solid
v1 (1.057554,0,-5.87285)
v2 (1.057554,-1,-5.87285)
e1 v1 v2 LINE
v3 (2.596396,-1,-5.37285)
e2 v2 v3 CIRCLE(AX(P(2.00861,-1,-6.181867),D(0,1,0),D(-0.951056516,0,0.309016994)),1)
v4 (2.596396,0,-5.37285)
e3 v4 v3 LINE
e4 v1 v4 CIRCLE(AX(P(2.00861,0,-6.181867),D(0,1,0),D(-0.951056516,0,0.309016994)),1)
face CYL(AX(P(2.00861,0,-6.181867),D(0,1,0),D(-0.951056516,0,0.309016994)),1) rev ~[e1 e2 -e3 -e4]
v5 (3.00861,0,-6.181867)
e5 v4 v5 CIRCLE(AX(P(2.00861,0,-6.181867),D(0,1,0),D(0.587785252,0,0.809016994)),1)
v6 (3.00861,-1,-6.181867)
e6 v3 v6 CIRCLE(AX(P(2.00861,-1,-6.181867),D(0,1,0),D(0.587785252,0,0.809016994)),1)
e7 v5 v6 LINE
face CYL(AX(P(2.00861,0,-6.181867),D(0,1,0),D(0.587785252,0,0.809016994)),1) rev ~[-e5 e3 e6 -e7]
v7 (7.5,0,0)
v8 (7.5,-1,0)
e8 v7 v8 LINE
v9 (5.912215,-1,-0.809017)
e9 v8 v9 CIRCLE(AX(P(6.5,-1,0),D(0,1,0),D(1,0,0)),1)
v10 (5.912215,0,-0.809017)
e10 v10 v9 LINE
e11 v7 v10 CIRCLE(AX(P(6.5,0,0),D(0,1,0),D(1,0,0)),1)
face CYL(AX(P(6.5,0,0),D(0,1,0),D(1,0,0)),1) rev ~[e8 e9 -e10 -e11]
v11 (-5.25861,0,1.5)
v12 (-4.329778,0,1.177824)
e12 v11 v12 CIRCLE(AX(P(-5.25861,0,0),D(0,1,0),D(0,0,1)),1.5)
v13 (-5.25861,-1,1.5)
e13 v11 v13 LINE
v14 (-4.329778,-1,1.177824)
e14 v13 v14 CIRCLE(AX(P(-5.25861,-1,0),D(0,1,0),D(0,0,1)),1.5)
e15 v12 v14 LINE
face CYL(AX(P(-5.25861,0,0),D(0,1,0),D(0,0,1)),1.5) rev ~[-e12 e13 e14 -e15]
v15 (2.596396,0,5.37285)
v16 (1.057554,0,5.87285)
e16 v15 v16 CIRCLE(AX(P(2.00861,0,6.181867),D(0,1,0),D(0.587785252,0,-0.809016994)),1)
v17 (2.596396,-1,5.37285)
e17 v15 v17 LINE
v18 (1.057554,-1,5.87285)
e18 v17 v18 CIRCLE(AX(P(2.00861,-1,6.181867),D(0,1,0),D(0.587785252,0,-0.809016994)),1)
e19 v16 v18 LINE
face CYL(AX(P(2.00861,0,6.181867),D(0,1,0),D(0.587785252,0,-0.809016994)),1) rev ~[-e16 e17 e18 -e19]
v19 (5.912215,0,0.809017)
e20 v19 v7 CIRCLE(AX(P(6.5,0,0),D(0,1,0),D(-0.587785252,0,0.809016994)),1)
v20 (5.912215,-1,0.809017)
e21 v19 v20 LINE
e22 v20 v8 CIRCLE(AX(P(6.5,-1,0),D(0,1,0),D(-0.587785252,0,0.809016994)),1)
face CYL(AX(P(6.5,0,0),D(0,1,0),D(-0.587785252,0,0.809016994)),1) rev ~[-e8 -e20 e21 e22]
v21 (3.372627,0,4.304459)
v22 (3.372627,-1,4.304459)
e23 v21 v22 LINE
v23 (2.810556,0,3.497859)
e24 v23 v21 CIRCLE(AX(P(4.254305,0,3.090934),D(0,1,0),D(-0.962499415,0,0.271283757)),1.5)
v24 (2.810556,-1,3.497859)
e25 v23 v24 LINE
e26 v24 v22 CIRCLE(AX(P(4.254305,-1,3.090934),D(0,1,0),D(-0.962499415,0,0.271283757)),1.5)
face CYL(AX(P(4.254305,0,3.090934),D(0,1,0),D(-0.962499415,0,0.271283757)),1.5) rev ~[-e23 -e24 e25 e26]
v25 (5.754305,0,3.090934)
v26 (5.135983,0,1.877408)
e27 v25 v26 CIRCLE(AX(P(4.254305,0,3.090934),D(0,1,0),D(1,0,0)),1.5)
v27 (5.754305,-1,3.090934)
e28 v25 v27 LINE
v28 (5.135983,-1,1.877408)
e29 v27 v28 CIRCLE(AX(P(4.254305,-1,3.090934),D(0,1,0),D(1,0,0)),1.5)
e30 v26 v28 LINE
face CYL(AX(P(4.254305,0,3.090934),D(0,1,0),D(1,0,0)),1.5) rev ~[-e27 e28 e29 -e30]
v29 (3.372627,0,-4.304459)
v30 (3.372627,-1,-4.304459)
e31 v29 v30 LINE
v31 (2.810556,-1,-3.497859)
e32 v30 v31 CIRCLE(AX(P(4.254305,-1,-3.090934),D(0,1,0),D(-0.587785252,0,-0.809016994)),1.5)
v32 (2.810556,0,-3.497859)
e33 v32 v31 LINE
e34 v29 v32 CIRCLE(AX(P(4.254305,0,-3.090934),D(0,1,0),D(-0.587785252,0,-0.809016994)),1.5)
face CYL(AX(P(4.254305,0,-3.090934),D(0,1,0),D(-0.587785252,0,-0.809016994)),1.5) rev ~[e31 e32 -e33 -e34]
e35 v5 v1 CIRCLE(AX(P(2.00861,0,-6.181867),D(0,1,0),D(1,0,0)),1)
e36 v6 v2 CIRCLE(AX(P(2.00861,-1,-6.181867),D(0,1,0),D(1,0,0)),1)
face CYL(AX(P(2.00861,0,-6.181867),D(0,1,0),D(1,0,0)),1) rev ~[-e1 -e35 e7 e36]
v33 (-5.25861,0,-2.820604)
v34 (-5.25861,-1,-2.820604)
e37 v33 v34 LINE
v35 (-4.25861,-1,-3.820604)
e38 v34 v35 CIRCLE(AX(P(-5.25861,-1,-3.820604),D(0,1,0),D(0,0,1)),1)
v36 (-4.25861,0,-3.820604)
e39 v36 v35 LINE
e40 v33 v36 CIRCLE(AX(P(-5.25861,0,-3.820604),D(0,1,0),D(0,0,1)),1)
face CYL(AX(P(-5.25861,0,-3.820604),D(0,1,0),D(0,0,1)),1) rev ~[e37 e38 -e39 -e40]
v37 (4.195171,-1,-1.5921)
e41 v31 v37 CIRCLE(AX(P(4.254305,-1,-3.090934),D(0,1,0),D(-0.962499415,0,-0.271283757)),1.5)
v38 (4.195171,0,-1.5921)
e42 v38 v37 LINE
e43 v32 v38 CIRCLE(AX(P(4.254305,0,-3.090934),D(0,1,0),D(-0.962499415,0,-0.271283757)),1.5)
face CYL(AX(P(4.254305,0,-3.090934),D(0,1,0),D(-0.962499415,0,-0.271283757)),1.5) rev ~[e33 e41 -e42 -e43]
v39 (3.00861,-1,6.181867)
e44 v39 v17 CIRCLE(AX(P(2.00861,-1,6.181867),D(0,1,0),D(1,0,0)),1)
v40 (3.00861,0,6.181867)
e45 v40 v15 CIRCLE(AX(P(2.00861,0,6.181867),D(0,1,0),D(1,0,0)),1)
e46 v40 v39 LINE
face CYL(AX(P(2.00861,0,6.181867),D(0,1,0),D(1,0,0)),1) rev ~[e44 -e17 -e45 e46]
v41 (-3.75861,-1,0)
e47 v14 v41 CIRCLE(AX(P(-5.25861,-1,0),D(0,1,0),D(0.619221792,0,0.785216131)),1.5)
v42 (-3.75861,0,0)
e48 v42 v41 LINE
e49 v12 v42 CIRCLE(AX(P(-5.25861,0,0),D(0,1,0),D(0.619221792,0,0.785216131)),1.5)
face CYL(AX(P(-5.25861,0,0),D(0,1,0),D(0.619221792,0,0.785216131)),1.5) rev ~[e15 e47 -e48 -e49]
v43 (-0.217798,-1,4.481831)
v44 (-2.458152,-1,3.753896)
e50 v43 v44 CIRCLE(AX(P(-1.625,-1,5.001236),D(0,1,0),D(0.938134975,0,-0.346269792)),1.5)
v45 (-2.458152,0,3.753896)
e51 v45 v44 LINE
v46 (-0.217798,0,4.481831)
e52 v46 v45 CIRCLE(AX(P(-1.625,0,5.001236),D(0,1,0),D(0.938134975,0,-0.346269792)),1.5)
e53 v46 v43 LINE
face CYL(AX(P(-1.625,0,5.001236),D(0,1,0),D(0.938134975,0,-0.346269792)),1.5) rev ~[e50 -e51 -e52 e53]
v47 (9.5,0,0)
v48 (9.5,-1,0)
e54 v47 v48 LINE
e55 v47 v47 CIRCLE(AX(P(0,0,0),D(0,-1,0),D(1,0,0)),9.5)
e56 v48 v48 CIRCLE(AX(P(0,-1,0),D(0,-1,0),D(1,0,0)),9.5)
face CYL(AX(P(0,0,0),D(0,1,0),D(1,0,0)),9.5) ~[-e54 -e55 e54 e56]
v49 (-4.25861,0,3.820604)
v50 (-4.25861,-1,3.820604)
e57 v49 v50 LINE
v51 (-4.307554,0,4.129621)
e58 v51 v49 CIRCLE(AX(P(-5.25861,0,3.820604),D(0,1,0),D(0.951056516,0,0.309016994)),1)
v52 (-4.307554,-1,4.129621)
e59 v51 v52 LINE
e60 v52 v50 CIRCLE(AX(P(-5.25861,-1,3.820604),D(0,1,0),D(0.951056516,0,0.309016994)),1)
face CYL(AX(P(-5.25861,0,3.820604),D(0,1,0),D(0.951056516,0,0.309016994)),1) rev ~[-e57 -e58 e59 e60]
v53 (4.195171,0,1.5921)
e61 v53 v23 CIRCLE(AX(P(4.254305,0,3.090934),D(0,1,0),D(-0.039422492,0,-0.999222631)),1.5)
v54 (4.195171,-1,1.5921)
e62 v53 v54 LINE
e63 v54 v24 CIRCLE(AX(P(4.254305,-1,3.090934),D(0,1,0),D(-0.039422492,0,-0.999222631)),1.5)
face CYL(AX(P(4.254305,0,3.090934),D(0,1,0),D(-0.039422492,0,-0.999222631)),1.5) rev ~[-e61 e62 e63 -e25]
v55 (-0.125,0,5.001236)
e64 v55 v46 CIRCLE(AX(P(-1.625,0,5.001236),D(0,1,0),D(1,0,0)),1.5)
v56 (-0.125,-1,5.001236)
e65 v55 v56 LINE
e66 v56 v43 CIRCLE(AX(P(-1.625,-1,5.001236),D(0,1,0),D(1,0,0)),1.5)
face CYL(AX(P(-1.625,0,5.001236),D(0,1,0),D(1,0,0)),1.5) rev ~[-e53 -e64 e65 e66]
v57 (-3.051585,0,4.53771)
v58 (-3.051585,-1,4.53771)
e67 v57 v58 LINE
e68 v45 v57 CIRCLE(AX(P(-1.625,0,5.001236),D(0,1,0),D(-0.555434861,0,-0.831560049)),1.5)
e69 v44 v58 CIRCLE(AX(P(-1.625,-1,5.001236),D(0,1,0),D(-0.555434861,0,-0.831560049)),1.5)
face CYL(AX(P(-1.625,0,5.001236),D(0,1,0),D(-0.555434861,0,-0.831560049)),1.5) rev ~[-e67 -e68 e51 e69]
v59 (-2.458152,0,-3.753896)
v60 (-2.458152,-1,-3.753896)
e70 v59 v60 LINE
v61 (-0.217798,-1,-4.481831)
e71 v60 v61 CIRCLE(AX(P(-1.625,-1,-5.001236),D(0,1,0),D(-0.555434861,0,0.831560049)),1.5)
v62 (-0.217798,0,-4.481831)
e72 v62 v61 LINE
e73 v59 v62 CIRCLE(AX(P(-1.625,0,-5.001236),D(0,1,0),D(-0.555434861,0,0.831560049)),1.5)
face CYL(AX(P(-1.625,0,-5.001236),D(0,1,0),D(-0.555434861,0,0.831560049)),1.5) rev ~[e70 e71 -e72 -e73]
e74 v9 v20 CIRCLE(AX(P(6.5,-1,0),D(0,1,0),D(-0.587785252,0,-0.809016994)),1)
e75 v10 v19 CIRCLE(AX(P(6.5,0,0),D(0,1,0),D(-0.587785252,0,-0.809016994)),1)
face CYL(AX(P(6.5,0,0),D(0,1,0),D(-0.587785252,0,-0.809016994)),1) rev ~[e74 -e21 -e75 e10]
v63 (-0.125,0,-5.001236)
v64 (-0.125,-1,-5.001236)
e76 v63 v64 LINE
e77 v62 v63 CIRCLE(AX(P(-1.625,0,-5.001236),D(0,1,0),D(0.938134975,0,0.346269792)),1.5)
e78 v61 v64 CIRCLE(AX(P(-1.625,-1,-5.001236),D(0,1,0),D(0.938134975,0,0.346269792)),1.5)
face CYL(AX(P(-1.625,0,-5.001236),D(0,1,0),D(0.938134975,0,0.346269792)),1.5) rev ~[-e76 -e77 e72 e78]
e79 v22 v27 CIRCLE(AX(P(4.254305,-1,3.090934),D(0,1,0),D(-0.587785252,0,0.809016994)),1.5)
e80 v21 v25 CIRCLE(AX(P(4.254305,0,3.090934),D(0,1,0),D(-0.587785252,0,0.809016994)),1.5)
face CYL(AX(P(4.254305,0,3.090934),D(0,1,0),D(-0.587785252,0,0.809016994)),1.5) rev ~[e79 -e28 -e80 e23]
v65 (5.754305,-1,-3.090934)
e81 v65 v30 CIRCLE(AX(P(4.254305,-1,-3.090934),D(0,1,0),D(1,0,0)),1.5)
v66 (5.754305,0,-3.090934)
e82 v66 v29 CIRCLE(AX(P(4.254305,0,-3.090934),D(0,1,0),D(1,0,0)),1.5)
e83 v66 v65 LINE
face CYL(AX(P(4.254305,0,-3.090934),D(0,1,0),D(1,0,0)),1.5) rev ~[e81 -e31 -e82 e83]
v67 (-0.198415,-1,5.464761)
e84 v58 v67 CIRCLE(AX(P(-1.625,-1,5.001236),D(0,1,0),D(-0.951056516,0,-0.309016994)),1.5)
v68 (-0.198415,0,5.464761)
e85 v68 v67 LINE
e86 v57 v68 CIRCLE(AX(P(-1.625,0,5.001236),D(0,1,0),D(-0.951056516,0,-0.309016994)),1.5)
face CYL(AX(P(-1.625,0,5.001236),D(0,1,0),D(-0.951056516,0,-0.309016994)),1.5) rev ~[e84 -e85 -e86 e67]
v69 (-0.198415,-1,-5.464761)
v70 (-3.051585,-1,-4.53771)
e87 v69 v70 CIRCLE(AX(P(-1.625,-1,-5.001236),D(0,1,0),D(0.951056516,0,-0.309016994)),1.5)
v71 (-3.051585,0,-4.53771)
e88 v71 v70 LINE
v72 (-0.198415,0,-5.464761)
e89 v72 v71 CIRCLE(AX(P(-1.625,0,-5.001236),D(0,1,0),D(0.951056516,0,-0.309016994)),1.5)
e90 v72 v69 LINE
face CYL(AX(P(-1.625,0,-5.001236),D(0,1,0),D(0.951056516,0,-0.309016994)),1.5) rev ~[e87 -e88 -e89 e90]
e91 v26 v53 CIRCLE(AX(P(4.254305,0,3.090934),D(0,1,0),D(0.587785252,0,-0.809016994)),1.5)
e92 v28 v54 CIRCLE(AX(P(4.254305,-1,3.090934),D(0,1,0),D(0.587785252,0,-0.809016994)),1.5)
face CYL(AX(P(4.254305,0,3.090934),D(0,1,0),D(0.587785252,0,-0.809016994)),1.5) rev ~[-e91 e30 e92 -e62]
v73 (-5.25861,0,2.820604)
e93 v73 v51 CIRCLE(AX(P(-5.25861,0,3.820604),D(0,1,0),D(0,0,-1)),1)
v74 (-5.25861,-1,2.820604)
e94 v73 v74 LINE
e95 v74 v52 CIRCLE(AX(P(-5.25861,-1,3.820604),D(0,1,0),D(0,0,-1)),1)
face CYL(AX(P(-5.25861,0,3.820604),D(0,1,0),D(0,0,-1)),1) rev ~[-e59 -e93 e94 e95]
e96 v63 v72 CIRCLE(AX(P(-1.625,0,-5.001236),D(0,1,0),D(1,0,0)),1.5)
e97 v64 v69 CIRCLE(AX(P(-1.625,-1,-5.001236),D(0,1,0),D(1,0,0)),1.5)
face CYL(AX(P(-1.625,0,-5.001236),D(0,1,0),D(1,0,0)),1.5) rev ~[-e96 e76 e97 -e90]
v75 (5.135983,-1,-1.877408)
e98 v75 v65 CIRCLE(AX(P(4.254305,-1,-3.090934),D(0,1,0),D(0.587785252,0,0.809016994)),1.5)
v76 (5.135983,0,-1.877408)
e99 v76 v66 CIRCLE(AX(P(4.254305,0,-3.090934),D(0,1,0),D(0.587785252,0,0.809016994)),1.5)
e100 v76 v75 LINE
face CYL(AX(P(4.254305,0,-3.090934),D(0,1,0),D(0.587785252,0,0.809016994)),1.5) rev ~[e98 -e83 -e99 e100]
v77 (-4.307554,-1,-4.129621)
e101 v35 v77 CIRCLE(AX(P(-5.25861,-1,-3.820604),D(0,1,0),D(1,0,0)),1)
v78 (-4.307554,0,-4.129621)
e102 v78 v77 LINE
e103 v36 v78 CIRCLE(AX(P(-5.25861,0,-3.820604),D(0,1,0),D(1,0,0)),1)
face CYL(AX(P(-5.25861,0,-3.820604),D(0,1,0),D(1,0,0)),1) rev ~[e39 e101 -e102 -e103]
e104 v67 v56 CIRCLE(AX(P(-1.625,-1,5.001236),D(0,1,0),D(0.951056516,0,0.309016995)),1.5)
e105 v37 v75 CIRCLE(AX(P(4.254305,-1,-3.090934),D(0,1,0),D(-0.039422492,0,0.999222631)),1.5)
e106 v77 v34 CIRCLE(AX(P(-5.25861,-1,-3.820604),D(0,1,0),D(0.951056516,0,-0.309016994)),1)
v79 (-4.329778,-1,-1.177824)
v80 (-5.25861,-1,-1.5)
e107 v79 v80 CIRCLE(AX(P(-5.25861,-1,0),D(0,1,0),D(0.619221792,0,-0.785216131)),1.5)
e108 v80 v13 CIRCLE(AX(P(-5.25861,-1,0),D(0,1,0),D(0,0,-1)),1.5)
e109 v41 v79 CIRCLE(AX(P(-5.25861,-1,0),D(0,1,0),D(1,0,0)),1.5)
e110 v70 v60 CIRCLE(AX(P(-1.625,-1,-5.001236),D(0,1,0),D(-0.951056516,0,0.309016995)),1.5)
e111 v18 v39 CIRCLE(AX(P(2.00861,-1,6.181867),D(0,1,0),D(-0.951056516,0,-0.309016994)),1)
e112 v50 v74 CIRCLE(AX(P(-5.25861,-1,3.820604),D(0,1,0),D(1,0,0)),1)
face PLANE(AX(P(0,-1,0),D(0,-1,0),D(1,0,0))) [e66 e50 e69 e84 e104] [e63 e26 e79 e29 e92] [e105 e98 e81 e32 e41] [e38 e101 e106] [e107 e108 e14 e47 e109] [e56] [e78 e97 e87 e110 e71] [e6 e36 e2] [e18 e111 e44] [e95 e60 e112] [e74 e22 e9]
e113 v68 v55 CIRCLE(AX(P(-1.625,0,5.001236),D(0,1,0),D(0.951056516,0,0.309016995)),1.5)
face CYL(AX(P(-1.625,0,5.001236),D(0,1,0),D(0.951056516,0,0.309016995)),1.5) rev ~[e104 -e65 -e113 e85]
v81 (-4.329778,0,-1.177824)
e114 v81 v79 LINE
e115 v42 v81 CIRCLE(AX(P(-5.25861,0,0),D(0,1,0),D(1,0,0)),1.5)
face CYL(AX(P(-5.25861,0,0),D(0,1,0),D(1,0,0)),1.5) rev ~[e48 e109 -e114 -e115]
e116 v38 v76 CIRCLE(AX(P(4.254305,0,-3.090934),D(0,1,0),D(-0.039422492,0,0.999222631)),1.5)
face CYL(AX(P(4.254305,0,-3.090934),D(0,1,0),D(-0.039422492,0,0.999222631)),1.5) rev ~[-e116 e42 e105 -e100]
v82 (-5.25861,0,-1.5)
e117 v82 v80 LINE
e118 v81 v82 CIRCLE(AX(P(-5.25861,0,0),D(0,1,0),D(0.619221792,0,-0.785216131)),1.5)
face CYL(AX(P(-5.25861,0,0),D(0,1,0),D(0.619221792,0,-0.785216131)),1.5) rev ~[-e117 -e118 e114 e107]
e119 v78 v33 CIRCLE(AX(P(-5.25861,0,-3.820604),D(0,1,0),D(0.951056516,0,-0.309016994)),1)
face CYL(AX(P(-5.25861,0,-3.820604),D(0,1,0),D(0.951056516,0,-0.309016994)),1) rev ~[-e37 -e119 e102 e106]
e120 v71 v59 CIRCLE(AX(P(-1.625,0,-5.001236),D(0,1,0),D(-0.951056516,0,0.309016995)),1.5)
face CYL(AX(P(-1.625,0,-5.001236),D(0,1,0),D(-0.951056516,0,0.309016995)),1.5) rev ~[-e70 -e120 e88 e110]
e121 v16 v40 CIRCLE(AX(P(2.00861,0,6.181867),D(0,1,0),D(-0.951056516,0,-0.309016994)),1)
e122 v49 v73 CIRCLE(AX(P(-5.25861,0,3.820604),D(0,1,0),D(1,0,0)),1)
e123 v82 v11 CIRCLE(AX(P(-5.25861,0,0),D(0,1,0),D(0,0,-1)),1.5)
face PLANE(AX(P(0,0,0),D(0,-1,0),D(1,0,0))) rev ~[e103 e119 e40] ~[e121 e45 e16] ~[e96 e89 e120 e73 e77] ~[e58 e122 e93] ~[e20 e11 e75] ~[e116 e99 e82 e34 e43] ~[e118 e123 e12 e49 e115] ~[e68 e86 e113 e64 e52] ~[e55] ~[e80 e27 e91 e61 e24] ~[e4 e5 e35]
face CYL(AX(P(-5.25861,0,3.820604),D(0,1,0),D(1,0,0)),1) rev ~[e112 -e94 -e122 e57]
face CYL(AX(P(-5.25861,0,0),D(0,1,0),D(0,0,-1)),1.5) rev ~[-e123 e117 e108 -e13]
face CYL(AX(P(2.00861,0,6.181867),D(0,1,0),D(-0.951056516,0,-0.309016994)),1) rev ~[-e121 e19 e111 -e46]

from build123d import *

# Parameters (mm, degrees)
F0_R     = 9.5
F1_DEPTH = 1


# Not quite as in the source:
# - a feature names something its author has since deleted; it is built from what else it names


with BuildPart() as f1:
    # F0 (on Front) → F1 (new body)
    with BuildSketch(Plane.XZ):
        Circle(F0_R)
        with BuildLine():
            Line((-6.1874431518, -2.6427799437), (-5.2586104634, -1.91030207))
            Line((-5.2586104634, -1.91030207), (-5.2586104634, -1.5))
            ThreePointArc((-5.2586104634, -1.5), (-6.7586104634, 0), (-5.2586104634, 1.5))
            Line((-5.2586104634, 1.5), (-5.2586104634, 1.91030207))
            Line((-5.2586104634, 1.91030207), (-6.1874431518, 2.6427799437))
            ThreePointArc((-6.1874431518, 2.6427799437), (-6.472135955, 4.7022820183), (-4.4254581722, 5.0679442137))
            Line((-4.4254581722, 5.0679442137), (-3.4418052317, 4.4109199439))
            Line((-3.4418052317, 4.4109199439), (-3.0515847744, 4.5377102563))
            ThreePointArc((-3.0515847744, 4.5377102563), (-2.0885254916, 6.4278205224), (-0.1984152256, 5.4647612395))
            Line((-0.1984152256, 5.4647612395), (0.1918052317, 5.5915515519))
            Line((0.1918052317, 5.5915515519), (0.601408001, 6.7012720437))
            ThreePointArc((0.601408001, 6.7012720437), (2.2724250824, 7.6584857382), (3.5086104634, 6.1818673559))
            ThreePointArc((3.5086104634, 6.1818673559), (3.4944811986, 5.976469794), (3.4523595855, 5.7749417209))
            Line((3.4523595855, 5.7749417209), (3.1314578476, 4.6364005169))
            Line((3.1314578476, 4.6364005169), (3.3726273533, 4.3044591695))
            ThreePointArc((3.3726273533, 4.3044591695), (4.9352909813, 4.4274434642), (5.7543052317, 3.090933678))
            ThreePointArc((5.7543052317, 3.090933678), (5.590815018, 2.4099479283), (5.1359831102, 1.8774081864))
            Line((5.1359831102, 1.8774081864), (5.3771526159, 1.545466839))
            Line((5.3771526159, 1.545466839), (6.5591337375, 1.4988339471))
            ThreePointArc((6.5591337375, 1.4988339471), (7.5813650184, 1.0395430231), (8, 0))
            ThreePointArc((8, 0), (7.5813650184, -1.0395430231), (6.5591337375, -1.4988339471))
            Line((6.5591337375, -1.4988339471), (5.3771526159, -1.545466839))
            Line((5.3771526159, -1.545466839), (5.1359831102, -1.8774081864))
            ThreePointArc((5.1359831102, -1.8774081864), (5.590815018, -2.4099479283), (5.7543052317, -3.090933678))
            ThreePointArc((5.7543052317, -3.090933678), (4.9352909813, -4.4274434642), (3.3726273533, -4.3044591695))
            Line((3.3726273533, -4.3044591695), (3.1314578476, -4.6364005169))
            Line((3.1314578476, -4.6364005169), (3.4523595855, -5.7749417209))
            ThreePointArc((3.4523595855, -5.7749417209), (3.4944811986, -5.976469794), (3.5086104634, -6.1818673559))
            ThreePointArc((3.5086104634, -6.1818673559), (2.2724250824, -7.6584857382), (0.601408001, -6.7012720437))
            Line((0.601408001, -6.7012720437), (0.1918052317, -5.5915515519))
            Line((0.1918052317, -5.5915515519), (-0.1984152256, -5.4647612395))
            ThreePointArc((-0.1984152256, -5.4647612395), (-2.0885254916, -6.4278205224), (-3.0515847744, -4.5377102563))
            Line((-3.0515847744, -4.5377102563), (-3.4418052317, -4.4109199439))
            Line((-3.4418052317, -4.4109199439), (-4.4254581722, -5.0679442137))
            ThreePointArc((-4.4254581722, -5.0679442137), (-6.472135955, -4.7022820183), (-6.1874431518, -2.6427799437))
        make_face(mode=Mode.SUBTRACT)
        with BuildLine():
            Line((-5.2586104634, -1.91030207), (-5.2586104634, -2.3206041399))
            ThreePointArc((-5.2586104634, -2.3206041399), (-4.1979502917, -2.7599439681), (-3.7586104634, -3.8206041399))
            ThreePointArc((-3.7586104634, -3.8206041399), (-3.7770779525, -4.0552558375), (-3.832025689, -4.2841296315))
            Line((-3.832025689, -4.2841296315), (-3.4418052317, -4.4109199439))
            Line((-3.4418052317, -4.4109199439), (-2.4581522912, -3.7538956741))
            ThreePointArc((-2.4581522912, -3.7538956741), (-1.1614745084, -3.5746509735), (-0.2177975376, -4.4818310601))
            Line((-0.2177975376, -4.4818310601), (0.1918052317, -5.5915515519))
            Line((0.1918052317, -5.5915515519), (0.582025689, -5.7183418644))
            ThreePointArc((0.582025689, -5.7183418644), (1.5450849719, -4.7552825815), (2.8902883419, -4.9683418644))
            Line((2.8902883419, -4.9683418644), (3.1314578476, -4.6364005169))
            Line((3.1314578476, -4.6364005169), (2.8105561096, -3.497859313))
            ThreePointArc((2.8105561096, -3.497859313), (3.0407797402, -2.2092557995), (4.1951714942, -1.5920997308))
            Line((4.1951714942, -1.5920997308), (5.3771526159, -1.545466839))
            Line((5.3771526159, -1.545466839), (5.6183221216, -1.2135254916))
            ThreePointArc((5.6183221216, -1.2135254916), (5, 0), (5.6183221216, 1.2135254916))
            Line((5.6183221216, 1.2135254916), (5.3771526159, 1.545466839))
            Line((5.3771526159, 1.545466839), (4.1951714942, 1.5920997308))
            ThreePointArc((4.1951714942, 1.5920997308), (3.0407797402, 2.2092557995), (2.8105561096, 3.497859313))
            Line((2.8105561096, 3.497859313), (3.1314578476, 4.6364005169))
            Line((3.1314578476, 4.6364005169), (2.8902883419, 4.9683418644))
            ThreePointArc((2.8902883419, 4.9683418644), (1.5450849719, 4.7552825815), (0.582025689, 5.7183418644))
            Line((0.582025689, 5.7183418644), (0.1918052317, 5.5915515519))
            Line((0.1918052317, 5.5915515519), (-0.2177975376, 4.4818310601))
            ThreePointArc((-0.2177975376, 4.4818310601), (-1.1614745084, 3.5746509735), (-2.4581522912, 3.7538956741))
            Line((-2.4581522912, 3.7538956741), (-3.4418052317, 4.4109199439))
            Line((-3.4418052317, 4.4109199439), (-3.832025689, 4.2841296315))
            ThreePointArc((-3.832025689, 4.2841296315), (-3.7770779525, 4.0552558375), (-3.7586104634, 3.8206041399))
            ThreePointArc((-3.7586104634, 3.8206041399), (-4.1979502917, 2.7599439681), (-5.2586104634, 2.3206041399))
            Line((-5.2586104634, 2.3206041399), (-5.2586104634, 1.91030207))
            Line((-5.2586104634, 1.91030207), (-4.3297777751, 1.1778241962))
            ThreePointArc((-4.3297777751, 1.1778241962), (-3.9089347556, 0.6545039983), (-3.7586104634, 0))
            ThreePointArc((-3.7586104634, 0), (-3.9089347556, -0.6545039983), (-4.3297777751, -1.1778241962))
            Line((-4.3297777751, -1.1778241962), (-5.2586104634, -1.91030207))
        make_face()
        with BuildLine():
            ThreePointArc((1.5, 2), (2.2360679775, 1.1180339887), (2.5, 0))
            ThreePointArc((2.5, 0), (2.2360679775, -1.1180339887), (1.5, -2))
            ThreePointArc((1.5, -2), (-2.5, 0), (1.5, 2))
        make_face(mode=Mode.SUBTRACT)
        with BuildLine():
            Line((1.5, -2), (1.5, 2))
            ThreePointArc((1.5, 2), (-2.5, 0), (1.5, -2))
        make_face()
        with BuildLine():
            ThreePointArc((1.5, -2), (2.2360679775, -1.1180339887), (2.5, 0))
            ThreePointArc((2.5, 0), (2.2360679775, 1.1180339887), (1.5, 2))
            Line((1.5, 2), (1.5, -2))
        make_face()
        with BuildLine():
            ThreePointArc((-4.3075539471, -4.1296211343), (-6.0676274578, -4.4083893922), (-5.2586104634, -2.8206041399))
            Line((-5.2586104634, -2.8206041399), (-5.2586104634, -2.3206041399))
            ThreePointArc((-5.2586104634, -2.3206041399), (-5.7501710933, -2.403435079), (-6.1874431518, -2.6427799437))
            ThreePointArc((-6.1874431518, -2.6427799437), (-6.472135955, -4.7022820183), (-4.4254581722, -5.0679442137))
            ThreePointArc((-4.4254581722, -5.0679442137), (-4.0627031818, -4.7260354038), (-3.832025689, -4.2841296315))
            Line((-3.832025689, -4.2841296315), (-4.3075539471, -4.1296211343))
        make_face()
        with BuildLine():
            ThreePointArc((-6.1874431518, 2.6427799437), (-5.7501710933, 2.403435079), (-5.2586104634, 2.3206041399))
            Line((-5.2586104634, 2.3206041399), (-5.2586104634, 2.8206041399))
            ThreePointArc((-5.2586104634, 2.8206041399), (-6.0676274578, 4.4083893922), (-4.3075539471, 4.1296211343))
            Line((-4.3075539471, 4.1296211343), (-3.832025689, 4.2841296315))
            ThreePointArc((-3.832025689, 4.2841296315), (-4.0627031818, 4.7260354038), (-4.4254581722, 5.0679442137))
            ThreePointArc((-4.4254581722, 5.0679442137), (-6.472135955, 4.7022820183), (-6.1874431518, 2.6427799437))
        make_face()
        with BuildLine():
            Line((1.0575539471, -5.8728503615), (0.582025689, -5.7183418644))
            ThreePointArc((0.582025689, -5.7183418644), (0.508902005, -6.2114399724), (0.601408001, -6.7012720437))
            ThreePointArc((0.601408001, -6.7012720437), (2.2724250824, -7.6584857382), (3.5086104634, -6.1818673559))
            ThreePointArc((3.5086104634, -6.1818673559), (3.4944811986, -5.976469794), (3.4523595855, -5.7749417209))
            ThreePointArc((3.4523595855, -5.7749417209), (3.2392824408, -5.3242855906), (2.8902883419, -4.9683418644))
            Line((2.8902883419, -4.9683418644), (2.5963957157, -5.3728503615))
            ThreePointArc((2.5963957157, -5.3728503615), (2.8996169876, -5.7278768562), (3.0086104634, -6.1818673559))
            ThreePointArc((3.0086104634, -6.1818673559), (1.8521759984, -7.1695556965), (1.0575539471, -5.8728503615))
        make_face()
        with BuildLine():
            ThreePointArc((0.601408001, 6.7012720437), (0.508902005, 6.2114399724), (0.582025689, 5.7183418644))
            Line((0.582025689, 5.7183418644), (1.0575539471, 5.8728503615))
            ThreePointArc((1.0575539471, 5.8728503615), (1.8521759984, 7.1695556965), (3.0086104634, 6.1818673559))
            ThreePointArc((3.0086104634, 6.1818673559), (2.8996169876, 5.7278768562), (2.5963957157, 5.3728503615))
            Line((2.5963957157, 5.3728503615), (2.8902883419, 4.9683418644))
            ThreePointArc((2.8902883419, 4.9683418644), (3.2392824408, 5.3242855906), (3.4523595855, 5.7749417209))
            ThreePointArc((3.4523595855, 5.7749417209), (3.4944811986, 5.976469794), (3.5086104634, 6.1818673559))
            ThreePointArc((3.5086104634, 6.1818673559), (2.2724250824, 7.6584857382), (0.601408001, 6.7012720437))
        make_face()
        with BuildLine():
            Line((5.9122147477, -0.8090169944), (5.6183221216, -1.2135254916))
            ThreePointArc((5.6183221216, -1.2135254916), (6.0646898294, -1.435445943), (6.5591337375, -1.4988339471))
            ThreePointArc((6.5591337375, -1.4988339471), (7.5813650184, -1.0395430231), (8, 0))
            ThreePointArc((8, 0), (7.5813650184, 1.0395430231), (6.5591337375, 1.4988339471))
            ThreePointArc((6.5591337375, 1.4988339471), (6.0646898294, 1.435445943), (5.6183221216, 1.2135254916))
            Line((5.6183221216, 1.2135254916), (5.9122147477, 0.8090169944))
            ThreePointArc((5.9122147477, 0.8090169944), (6.9539904997, 0.8910065242), (7.5, 0))
            ThreePointArc((7.5, 0), (6.9539904997, -0.8910065242), (5.9122147477, -0.8090169944))
        make_face()
        with BuildLine():
            Line((-5.2586104634, -2.3206041399), (-5.2586104634, -2.8206041399))
            ThreePointArc((-5.2586104634, -2.8206041399), (-4.5515036823, -3.1134973587), (-4.2586104634, -3.8206041399))
            ThreePointArc((-4.2586104634, -3.8206041399), (-4.2709221228, -3.9770386049), (-4.3075539471, -4.1296211343))
            Line((-4.3075539471, -4.1296211343), (-3.832025689, -4.2841296315))
            ThreePointArc((-3.832025689, -4.2841296315), (-3.7770779525, -4.0552558375), (-3.7586104634, -3.8206041399))
            ThreePointArc((-3.7586104634, -3.8206041399), (-4.1979502917, -2.7599439681), (-5.2586104634, -2.3206041399))
        make_face()
        with BuildLine():
            Line((-5.2586104634, 2.8206041399), (-5.2586104634, 2.3206041399))
            ThreePointArc((-5.2586104634, 2.3206041399), (-4.1979502917, 2.7599439681), (-3.7586104634, 3.8206041399))
            ThreePointArc((-3.7586104634, 3.8206041399), (-3.7770779525, 4.0552558375), (-3.832025689, 4.2841296315))
            Line((-3.832025689, 4.2841296315), (-4.3075539471, 4.1296211343))
            ThreePointArc((-4.3075539471, 4.1296211343), (-4.2709221228, 3.9770386049), (-4.2586104634, 3.8206041399))
            ThreePointArc((-4.2586104634, 3.8206041399), (-4.5515036823, 3.1134973587), (-5.2586104634, 2.8206041399))
        make_face()
        with BuildLine():
            ThreePointArc((2.8902883419, -4.9683418644), (1.5450849719, -4.7552825815), (0.582025689, -5.7183418644))
            Line((0.582025689, -5.7183418644), (1.0575539471, -5.8728503615))
            ThreePointArc((1.0575539471, -5.8728503615), (1.6995934691, -5.2308108396), (2.5963957157, -5.3728503615))
            Line((2.5963957157, -5.3728503615), (2.8902883419, -4.9683418644))
        make_face()
        with BuildLine():
            Line((1.0575539471, 5.8728503615), (0.582025689, 5.7183418644))
            ThreePointArc((0.582025689, 5.7183418644), (1.5450849719, 4.7552825815), (2.8902883419, 4.9683418644))
            Line((2.8902883419, 4.9683418644), (2.5963957157, 5.3728503615))
            ThreePointArc((2.5963957157, 5.3728503615), (1.6995934691, 5.2308108396), (1.0575539471, 5.8728503615))
        make_face()
        with BuildLine():
            ThreePointArc((5.6183221216, 1.2135254916), (5, 0), (5.6183221216, -1.2135254916))
            Line((5.6183221216, -1.2135254916), (5.9122147477, -0.8090169944))
            ThreePointArc((5.9122147477, -0.8090169944), (5.5, 0), (5.9122147477, 0.8090169944))
            Line((5.9122147477, 0.8090169944), (5.6183221216, 1.2135254916))
        make_face()
        with BuildLine():
            ThreePointArc((-6.1874431518, -2.6427799437), (-5.7501710933, -2.403435079), (-5.2586104634, -2.3206041399))
            Line((-5.2586104634, -2.3206041399), (-5.2586104634, -1.91030207))
            Line((-5.2586104634, -1.91030207), (-6.1874431518, -2.6427799437))
        make_face()
        with BuildLine():
            Line((-3.4418052317, -4.4109199439), (-3.832025689, -4.2841296315))
            ThreePointArc((-3.832025689, -4.2841296315), (-4.0627031818, -4.7260354038), (-4.4254581722, -5.0679442137))
            Line((-4.4254581722, -5.0679442137), (-3.4418052317, -4.4109199439))
        make_face()
        with BuildLine():
            Line((-5.2586104634, -1.5), (-5.2586104634, -1.91030207))
            Line((-5.2586104634, -1.91030207), (-4.3297777751, -1.1778241962))
            ThreePointArc((-4.3297777751, -1.1778241962), (-4.7670498335, -1.4171690609), (-5.2586104634, -1.5))
        make_face()
        with BuildLine():
            Line((-2.4581522912, -3.7538956741), (-3.4418052317, -4.4109199439))
            Line((-3.4418052317, -4.4109199439), (-3.0515847744, -4.5377102563))
            ThreePointArc((-3.0515847744, -4.5377102563), (-2.8209072816, -4.095804484), (-2.4581522912, -3.7538956741))
        make_face()
        with BuildLine():
            Line((-5.2586104634, 1.91030207), (-5.2586104634, 1.5))
            ThreePointArc((-5.2586104634, 1.5), (-4.7670498335, 1.4171690609), (-4.3297777751, 1.1778241962))
            Line((-4.3297777751, 1.1778241962), (-5.2586104634, 1.91030207))
        make_face()
        with BuildLine():
            ThreePointArc((-0.125, -5.0012357479), (-0.1434674891, -5.2358874455), (-0.1984152256, -5.4647612395))
            Line((-0.1984152256, -5.4647612395), (0.1918052317, -5.5915515519))
            Line((0.1918052317, -5.5915515519), (-0.2177975376, -4.4818310601))
            ThreePointArc((-0.2177975376, -4.4818310601), (-0.1483816177, -4.737421129), (-0.125, -5.0012357479))
        make_face()
        with BuildLine():
            Line((-6.1874431518, 2.6427799437), (-5.2586104634, 1.91030207))
            Line((-5.2586104634, 1.91030207), (-5.2586104634, 2.3206041399))
            ThreePointArc((-5.2586104634, 2.3206041399), (-5.7501710933, 2.403435079), (-6.1874431518, 2.6427799437))
        make_face()
        with BuildLine():
            Line((0.582025689, -5.7183418644), (0.1918052317, -5.5915515519))
            Line((0.1918052317, -5.5915515519), (0.601408001, -6.7012720437))
            ThreePointArc((0.601408001, -6.7012720437), (0.508902005, -6.2114399724), (0.582025689, -5.7183418644))
        make_face()
        with BuildLine():
            Line((-3.4418052317, 4.4109199439), (-4.4254581722, 5.0679442137))
            ThreePointArc((-4.4254581722, 5.0679442137), (-4.0627031818, 4.7260354038), (-3.832025689, 4.2841296315))
            Line((-3.832025689, 4.2841296315), (-3.4418052317, 4.4109199439))
        make_face()
        with BuildLine():
            Line((3.1314578476, -4.6364005169), (2.8902883419, -4.9683418644))
            ThreePointArc((2.8902883419, -4.9683418644), (3.2392824408, -5.3242855906), (3.4523595855, -5.7749417209))
            Line((3.4523595855, -5.7749417209), (3.1314578476, -4.6364005169))
        make_face()
        with BuildLine():
            Line((-3.0515847744, 4.5377102563), (-3.4418052317, 4.4109199439))
            Line((-3.4418052317, 4.4109199439), (-2.4581522912, 3.7538956741))
            ThreePointArc((-2.4581522912, 3.7538956741), (-2.8209072816, 4.095804484), (-3.0515847744, 4.5377102563))
        make_face()
        with BuildLine():
            Line((2.8105561096, -3.497859313), (3.1314578476, -4.6364005169))
            Line((3.1314578476, -4.6364005169), (3.3726273533, -4.3044591695))
            ThreePointArc((3.3726273533, -4.3044591695), (3.0236332544, -3.9485154433), (2.8105561096, -3.497859313))
        make_face()
        with BuildLine():
            Line((0.1918052317, 5.5915515519), (-0.1984152256, 5.4647612395))
            ThreePointArc((-0.1984152256, 5.4647612395), (-0.1434674891, 5.2358874455), (-0.125, 5.0012357479))
            ThreePointArc((-0.125, 5.0012357479), (-0.1483816177, 4.737421129), (-0.2177975376, 4.4818310601))
            Line((-0.2177975376, 4.4818310601), (0.1918052317, 5.5915515519))
        make_face()
        with BuildLine():
            ThreePointArc((4.1951714942, -1.5920997308), (4.6896154024, -1.6554877349), (5.1359831102, -1.8774081864))
            Line((5.1359831102, -1.8774081864), (5.3771526159, -1.545466839))
            Line((5.3771526159, -1.545466839), (4.1951714942, -1.5920997308))
        make_face()
        with BuildLine():
            Line((0.601408001, 6.7012720437), (0.1918052317, 5.5915515519))
            Line((0.1918052317, 5.5915515519), (0.582025689, 5.7183418644))
            ThreePointArc((0.582025689, 5.7183418644), (0.508902005, 6.2114399724), (0.601408001, 6.7012720437))
        make_face()
        with BuildLine():
            Line((5.6183221216, -1.2135254916), (5.3771526159, -1.545466839))
            Line((5.3771526159, -1.545466839), (6.5591337375, -1.4988339471))
            ThreePointArc((6.5591337375, -1.4988339471), (6.0646898294, -1.435445943), (5.6183221216, -1.2135254916))
        make_face()
        with BuildLine():
            ThreePointArc((3.4523595855, 5.7749417209), (3.2392824408, 5.3242855906), (2.8902883419, 4.9683418644))
            Line((2.8902883419, 4.9683418644), (3.1314578476, 4.6364005169))
            Line((3.1314578476, 4.6364005169), (3.4523595855, 5.7749417209))
        make_face()
        with BuildLine():
            Line((5.3771526159, 1.545466839), (5.6183221216, 1.2135254916))
            ThreePointArc((5.6183221216, 1.2135254916), (6.0646898294, 1.435445943), (6.5591337375, 1.4988339471))
            Line((6.5591337375, 1.4988339471), (5.3771526159, 1.545466839))
        make_face()
        with BuildLine():
            Line((3.3726273533, 4.3044591695), (3.1314578476, 4.6364005169))
            Line((3.1314578476, 4.6364005169), (2.8105561096, 3.497859313))
            ThreePointArc((2.8105561096, 3.497859313), (3.0236332544, 3.9485154433), (3.3726273533, 4.3044591695))
        make_face()
        with BuildLine():
            Line((4.1951714942, 1.5920997308), (5.3771526159, 1.545466839))
            Line((5.3771526159, 1.545466839), (5.1359831102, 1.8774081864))
            ThreePointArc((5.1359831102, 1.8774081864), (4.6896154024, 1.6554877349), (4.1951714942, 1.5920997308))
        make_face()
    extrude(amount=F1_DEPTH)


solid = f1.part
